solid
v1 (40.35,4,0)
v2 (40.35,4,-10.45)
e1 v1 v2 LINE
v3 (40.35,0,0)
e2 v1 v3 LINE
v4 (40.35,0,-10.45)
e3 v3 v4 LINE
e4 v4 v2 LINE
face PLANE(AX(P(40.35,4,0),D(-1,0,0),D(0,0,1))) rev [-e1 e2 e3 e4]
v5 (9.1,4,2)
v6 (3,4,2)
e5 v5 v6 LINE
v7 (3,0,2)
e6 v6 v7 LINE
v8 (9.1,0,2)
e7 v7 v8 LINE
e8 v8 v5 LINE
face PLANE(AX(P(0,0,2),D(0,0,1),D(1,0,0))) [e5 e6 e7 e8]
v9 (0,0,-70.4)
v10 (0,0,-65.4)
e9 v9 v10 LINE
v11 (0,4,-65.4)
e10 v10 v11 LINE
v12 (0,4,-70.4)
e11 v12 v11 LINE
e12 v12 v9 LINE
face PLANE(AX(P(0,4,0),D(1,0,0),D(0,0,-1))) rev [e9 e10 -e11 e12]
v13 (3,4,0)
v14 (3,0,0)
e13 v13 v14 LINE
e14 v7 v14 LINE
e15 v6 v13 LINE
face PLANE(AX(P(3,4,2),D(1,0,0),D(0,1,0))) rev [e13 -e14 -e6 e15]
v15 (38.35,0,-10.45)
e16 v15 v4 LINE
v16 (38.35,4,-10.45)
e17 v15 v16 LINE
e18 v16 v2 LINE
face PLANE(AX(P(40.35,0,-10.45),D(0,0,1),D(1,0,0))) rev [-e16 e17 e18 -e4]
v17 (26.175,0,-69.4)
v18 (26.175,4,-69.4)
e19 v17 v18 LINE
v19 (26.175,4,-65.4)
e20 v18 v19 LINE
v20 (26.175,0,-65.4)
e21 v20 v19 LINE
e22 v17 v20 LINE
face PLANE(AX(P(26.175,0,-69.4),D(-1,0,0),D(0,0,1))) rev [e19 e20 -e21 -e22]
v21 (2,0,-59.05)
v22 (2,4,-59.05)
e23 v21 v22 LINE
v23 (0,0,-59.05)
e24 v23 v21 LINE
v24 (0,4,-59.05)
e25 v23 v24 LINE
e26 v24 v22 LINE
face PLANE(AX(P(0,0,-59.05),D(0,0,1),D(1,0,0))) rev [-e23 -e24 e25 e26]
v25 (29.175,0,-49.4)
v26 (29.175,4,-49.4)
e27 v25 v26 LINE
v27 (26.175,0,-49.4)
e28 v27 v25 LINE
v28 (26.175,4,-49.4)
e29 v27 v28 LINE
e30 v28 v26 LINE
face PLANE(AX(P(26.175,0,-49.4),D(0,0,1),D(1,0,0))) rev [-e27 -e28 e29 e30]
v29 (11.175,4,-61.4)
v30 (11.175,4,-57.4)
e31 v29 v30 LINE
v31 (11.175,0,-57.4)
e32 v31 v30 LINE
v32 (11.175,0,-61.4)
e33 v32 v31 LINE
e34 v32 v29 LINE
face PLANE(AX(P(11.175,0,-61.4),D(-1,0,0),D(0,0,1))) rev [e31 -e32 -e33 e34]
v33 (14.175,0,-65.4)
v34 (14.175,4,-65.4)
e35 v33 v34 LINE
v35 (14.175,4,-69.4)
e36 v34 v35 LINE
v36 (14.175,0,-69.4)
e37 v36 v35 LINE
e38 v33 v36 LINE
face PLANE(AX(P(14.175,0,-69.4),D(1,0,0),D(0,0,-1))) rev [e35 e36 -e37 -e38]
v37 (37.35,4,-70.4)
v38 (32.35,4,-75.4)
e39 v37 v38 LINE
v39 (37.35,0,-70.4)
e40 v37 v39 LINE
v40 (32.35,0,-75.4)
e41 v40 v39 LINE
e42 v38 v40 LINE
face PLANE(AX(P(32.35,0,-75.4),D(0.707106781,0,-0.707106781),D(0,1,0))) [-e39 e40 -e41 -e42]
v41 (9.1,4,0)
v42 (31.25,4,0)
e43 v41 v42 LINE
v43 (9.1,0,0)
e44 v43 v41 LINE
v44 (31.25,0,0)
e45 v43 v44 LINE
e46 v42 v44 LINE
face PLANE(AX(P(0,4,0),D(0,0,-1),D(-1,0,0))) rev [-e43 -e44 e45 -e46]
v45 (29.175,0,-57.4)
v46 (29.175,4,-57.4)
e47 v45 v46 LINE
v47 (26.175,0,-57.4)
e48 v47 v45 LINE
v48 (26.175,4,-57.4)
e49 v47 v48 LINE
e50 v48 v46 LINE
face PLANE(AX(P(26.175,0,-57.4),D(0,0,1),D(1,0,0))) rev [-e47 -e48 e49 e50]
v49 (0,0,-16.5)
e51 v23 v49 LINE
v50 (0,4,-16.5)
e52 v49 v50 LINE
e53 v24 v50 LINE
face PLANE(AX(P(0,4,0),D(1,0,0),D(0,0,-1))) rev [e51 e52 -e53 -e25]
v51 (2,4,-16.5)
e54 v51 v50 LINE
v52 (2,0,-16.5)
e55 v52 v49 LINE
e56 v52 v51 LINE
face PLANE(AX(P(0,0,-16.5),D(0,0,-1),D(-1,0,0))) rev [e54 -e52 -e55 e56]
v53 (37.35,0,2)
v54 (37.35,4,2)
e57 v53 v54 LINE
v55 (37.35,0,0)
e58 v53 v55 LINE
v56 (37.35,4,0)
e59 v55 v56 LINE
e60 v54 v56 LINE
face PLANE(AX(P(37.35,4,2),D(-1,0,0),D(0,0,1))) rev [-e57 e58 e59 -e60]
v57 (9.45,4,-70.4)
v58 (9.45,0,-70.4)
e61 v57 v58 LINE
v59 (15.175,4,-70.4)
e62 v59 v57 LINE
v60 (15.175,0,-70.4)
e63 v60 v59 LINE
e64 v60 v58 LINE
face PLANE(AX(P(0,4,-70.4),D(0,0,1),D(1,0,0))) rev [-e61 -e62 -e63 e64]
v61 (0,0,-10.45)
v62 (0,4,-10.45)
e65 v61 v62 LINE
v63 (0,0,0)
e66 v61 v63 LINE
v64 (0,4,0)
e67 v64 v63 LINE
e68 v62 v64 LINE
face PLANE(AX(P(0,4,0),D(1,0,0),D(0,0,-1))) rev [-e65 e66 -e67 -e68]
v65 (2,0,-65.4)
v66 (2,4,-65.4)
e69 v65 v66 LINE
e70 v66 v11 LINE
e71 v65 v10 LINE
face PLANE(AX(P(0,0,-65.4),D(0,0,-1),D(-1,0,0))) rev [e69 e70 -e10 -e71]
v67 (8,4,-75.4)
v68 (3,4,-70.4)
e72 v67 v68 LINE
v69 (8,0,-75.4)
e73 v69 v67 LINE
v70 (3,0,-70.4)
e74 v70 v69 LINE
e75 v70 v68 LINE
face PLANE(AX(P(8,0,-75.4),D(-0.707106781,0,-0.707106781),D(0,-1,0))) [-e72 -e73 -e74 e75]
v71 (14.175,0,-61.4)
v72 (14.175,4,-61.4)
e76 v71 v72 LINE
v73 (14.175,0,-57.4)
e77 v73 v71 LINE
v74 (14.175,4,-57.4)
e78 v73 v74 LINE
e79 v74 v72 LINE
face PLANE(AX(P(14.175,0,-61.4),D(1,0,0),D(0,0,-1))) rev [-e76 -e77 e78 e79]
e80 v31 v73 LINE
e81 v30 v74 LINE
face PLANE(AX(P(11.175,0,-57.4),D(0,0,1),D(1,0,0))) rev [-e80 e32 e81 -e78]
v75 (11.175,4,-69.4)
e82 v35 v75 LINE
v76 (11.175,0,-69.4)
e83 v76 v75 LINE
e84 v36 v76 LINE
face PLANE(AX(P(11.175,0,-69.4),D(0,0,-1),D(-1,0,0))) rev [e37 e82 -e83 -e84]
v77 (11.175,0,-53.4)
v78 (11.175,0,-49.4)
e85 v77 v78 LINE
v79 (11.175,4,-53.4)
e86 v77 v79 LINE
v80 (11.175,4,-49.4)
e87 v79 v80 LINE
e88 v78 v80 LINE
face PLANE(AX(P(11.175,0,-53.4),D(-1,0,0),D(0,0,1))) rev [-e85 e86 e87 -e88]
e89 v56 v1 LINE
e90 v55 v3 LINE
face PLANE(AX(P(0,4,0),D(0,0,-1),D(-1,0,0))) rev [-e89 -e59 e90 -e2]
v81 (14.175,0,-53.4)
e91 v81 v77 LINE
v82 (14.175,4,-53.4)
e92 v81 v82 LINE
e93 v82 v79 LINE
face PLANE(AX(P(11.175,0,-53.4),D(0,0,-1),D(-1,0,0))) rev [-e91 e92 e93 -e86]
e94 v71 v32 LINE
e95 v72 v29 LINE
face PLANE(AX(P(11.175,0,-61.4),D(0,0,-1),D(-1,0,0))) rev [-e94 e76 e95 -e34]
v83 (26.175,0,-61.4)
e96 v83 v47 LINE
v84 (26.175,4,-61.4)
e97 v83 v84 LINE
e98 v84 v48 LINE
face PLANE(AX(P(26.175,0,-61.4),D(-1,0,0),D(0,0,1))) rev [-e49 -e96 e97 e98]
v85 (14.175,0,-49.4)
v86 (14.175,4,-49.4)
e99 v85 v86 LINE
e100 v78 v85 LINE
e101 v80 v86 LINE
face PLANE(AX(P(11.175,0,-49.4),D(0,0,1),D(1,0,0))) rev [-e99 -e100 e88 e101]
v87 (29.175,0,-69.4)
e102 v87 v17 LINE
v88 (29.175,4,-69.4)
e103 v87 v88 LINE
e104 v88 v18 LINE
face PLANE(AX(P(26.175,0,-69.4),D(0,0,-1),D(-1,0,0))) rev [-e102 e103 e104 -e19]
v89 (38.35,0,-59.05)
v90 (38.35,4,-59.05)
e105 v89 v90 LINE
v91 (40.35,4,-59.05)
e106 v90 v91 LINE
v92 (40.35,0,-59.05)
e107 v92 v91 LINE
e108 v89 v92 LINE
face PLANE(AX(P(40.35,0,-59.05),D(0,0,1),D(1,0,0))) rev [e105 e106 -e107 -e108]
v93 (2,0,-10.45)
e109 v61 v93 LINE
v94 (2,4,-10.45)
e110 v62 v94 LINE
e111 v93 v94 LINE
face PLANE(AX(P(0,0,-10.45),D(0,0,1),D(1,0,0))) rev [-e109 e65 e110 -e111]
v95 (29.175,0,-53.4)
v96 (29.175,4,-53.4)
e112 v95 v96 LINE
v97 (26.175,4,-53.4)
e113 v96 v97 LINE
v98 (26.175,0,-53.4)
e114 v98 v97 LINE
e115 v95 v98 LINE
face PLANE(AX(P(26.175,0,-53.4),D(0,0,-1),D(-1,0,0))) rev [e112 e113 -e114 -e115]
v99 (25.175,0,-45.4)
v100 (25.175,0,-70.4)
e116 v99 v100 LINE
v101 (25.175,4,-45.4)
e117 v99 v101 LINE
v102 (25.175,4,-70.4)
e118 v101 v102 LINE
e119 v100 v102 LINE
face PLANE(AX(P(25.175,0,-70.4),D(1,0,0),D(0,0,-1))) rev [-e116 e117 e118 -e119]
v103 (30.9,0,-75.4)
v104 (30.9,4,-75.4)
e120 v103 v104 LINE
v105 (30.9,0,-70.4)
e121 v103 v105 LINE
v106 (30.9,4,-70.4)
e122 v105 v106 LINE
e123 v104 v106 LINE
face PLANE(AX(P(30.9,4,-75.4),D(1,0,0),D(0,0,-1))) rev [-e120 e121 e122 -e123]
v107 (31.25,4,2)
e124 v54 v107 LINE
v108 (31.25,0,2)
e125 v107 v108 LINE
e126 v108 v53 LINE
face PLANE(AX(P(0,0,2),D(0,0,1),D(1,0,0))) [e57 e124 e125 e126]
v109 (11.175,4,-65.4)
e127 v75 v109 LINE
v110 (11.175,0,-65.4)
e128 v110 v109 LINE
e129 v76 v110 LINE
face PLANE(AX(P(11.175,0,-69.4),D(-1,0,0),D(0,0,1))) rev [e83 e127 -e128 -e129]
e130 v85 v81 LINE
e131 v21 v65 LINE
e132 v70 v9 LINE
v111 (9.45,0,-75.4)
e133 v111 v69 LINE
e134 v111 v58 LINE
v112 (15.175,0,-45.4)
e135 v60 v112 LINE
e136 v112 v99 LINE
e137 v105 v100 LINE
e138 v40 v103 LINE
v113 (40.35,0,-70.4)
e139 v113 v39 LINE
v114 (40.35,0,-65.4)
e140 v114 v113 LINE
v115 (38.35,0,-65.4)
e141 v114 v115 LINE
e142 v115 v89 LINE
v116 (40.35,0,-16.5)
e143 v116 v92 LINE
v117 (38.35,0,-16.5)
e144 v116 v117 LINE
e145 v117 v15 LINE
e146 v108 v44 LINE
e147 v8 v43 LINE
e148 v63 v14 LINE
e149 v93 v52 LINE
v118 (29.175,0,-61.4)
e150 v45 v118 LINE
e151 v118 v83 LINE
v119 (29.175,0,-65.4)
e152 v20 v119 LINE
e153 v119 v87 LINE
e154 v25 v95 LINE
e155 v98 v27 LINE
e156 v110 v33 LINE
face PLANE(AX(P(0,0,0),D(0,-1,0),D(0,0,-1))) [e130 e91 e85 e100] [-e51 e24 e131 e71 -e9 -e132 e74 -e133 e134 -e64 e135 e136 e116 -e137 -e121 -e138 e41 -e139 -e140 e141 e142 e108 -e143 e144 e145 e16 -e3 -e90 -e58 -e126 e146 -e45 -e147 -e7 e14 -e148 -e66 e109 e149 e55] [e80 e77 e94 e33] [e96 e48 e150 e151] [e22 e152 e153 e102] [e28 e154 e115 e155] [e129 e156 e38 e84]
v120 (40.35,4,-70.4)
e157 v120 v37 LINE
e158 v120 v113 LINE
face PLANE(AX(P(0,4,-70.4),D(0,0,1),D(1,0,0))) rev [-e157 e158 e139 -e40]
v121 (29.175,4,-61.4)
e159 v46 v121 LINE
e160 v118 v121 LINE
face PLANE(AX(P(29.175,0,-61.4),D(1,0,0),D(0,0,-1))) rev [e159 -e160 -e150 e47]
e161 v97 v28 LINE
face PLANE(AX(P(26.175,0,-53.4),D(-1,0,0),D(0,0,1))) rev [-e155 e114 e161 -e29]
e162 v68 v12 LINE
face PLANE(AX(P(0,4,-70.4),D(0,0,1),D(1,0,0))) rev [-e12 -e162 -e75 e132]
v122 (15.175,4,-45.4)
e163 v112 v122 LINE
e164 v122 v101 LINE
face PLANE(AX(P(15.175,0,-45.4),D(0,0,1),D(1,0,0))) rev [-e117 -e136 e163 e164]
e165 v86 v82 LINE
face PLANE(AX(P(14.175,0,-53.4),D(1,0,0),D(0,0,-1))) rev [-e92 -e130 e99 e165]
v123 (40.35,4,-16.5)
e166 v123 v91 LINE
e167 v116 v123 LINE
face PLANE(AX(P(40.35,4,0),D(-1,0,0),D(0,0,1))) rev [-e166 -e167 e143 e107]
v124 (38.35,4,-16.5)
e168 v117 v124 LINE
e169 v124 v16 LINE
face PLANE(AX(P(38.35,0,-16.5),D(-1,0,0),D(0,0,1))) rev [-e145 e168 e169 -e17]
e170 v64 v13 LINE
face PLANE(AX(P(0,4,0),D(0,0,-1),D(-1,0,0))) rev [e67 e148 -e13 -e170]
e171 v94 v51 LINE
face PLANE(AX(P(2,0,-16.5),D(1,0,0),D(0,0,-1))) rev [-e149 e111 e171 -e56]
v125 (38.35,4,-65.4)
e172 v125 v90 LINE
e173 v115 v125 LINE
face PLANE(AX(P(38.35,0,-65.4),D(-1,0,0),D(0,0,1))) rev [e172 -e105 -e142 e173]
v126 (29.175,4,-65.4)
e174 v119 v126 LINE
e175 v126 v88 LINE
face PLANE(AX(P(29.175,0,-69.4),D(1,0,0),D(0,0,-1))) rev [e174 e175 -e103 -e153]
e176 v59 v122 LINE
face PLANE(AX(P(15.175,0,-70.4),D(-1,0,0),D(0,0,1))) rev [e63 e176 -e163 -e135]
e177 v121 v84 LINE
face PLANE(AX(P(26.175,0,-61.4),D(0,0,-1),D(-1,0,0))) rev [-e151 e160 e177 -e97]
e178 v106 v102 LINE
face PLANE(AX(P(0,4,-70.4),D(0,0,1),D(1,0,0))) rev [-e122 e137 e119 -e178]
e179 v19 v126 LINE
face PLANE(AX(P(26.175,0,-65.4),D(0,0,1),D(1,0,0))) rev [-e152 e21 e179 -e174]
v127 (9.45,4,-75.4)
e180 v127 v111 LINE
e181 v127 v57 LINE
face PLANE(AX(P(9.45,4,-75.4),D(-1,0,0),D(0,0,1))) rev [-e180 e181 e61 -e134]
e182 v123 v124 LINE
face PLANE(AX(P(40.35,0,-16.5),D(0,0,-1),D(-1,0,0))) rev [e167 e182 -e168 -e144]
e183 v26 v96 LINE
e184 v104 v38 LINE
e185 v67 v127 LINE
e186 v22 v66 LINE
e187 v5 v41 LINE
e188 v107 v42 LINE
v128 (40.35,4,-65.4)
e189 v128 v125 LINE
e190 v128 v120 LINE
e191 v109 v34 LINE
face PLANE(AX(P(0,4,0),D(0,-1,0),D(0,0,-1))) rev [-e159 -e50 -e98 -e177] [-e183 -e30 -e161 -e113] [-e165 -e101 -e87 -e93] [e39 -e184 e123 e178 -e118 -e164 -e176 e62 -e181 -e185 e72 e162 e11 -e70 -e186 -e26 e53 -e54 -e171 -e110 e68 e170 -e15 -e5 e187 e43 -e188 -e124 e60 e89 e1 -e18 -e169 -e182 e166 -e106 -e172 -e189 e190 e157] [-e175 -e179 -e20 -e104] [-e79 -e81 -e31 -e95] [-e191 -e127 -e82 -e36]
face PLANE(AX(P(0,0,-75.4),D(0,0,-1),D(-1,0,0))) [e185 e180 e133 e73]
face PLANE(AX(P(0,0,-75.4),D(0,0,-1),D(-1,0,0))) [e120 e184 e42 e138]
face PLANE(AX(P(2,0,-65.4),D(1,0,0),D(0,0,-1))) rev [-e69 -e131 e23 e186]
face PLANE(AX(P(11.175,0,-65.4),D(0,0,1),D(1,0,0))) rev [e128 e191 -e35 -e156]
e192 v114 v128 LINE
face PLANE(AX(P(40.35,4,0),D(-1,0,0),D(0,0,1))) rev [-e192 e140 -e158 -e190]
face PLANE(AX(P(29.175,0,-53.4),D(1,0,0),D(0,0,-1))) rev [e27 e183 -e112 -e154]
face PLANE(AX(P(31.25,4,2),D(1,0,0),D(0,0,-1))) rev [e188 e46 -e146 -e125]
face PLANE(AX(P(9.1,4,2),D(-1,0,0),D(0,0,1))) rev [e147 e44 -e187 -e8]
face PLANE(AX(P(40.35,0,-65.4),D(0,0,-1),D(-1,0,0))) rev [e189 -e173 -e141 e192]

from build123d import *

# Parameters (mm, degrees)
SKETCH_1_W          = 40.35
SKETCH_1_H          = 70.4
EXTRUDE_1_DEPTH     = 4
SKETCH_2_W          = 2
SKETCH_2_H          = 6.05
SKETCH_2_H_2        = 6.35
SKETCH_2_W_2        = 10
SKETCH_2_H_3        = 25
CUT_EXTRUDE_3_DEPTH = 82.242122695
SKETCH_4_W          = 3
SKETCH_4_H          = 4
CUT_EXTRUDE_4_DEPTH = 82.242122695
SKETCH_5_W          = 6.45
SKETCH_5_H          = 4
EXTRUDE_2_DEPTH     = 5
CHAMFER_1_SIZE      = 5
SKETCH_6_W          = 6.1
SKETCH_6_H          = 4
EXTRUDE_3_DEPTH     = 2


with BuildPart() as part:
    # ｽｹｯﾁ1 → ﾎﾞｽ - 押し出し1 (new body)
    with BuildSketch(Plane(origin=(0, 0, 0), x_dir=(1, 0, 0), z_dir=(0, 1, 0))):
        with Locations((20.175, 35.2)):
            Rectangle(SKETCH_1_W, SKETCH_1_H)
    extrude(amount=EXTRUDE_1_DEPTH)

    # ｽｹｯﾁ2 → ｶｯﾄ - 押し出し3 (cut, through all)
    with BuildSketch(Plane(origin=(0, 4, 0), x_dir=(1, 0, 0), z_dir=(0, 1, 0))):
        with Locations((1, 13.475)):
            Rectangle(SKETCH_2_W, SKETCH_2_H)
        with Locations((39.35, 13.475)):
            Rectangle(SKETCH_2_W, SKETCH_2_H)
        with Locations((1, 62.225)):
            Rectangle(SKETCH_2_W, SKETCH_2_H_2)
        with Locations((39.35, 62.225)):
            Rectangle(SKETCH_2_W, SKETCH_2_H_2)
        with Locations((20.175, 57.9)):
            Rectangle(SKETCH_2_W_2, SKETCH_2_H_3)
    extrude(amount=-CUT_EXTRUDE_3_DEPTH, mode=Mode.SUBTRACT)

    # ｽｹｯﾁ4 → ｶｯﾄ - 押し出し4 (cut, through all)
    with BuildSketch(Plane(origin=(0, 4, 0), x_dir=(1, 0, 0), z_dir=(0, 1, 0))):
        with Locations((12.675, 67.4)):
            Rectangle(SKETCH_4_W, SKETCH_4_H)
        with Locations((12.675, 59.4)):
            Rectangle(SKETCH_4_W, SKETCH_4_H)
        with Locations((12.675, 51.4)):
            Rectangle(SKETCH_4_W, SKETCH_4_H)
        with Locations((27.675, 67.4)):
            Rectangle(SKETCH_4_W, SKETCH_4_H)
        with Locations((27.675, 59.4)):
            Rectangle(SKETCH_4_W, SKETCH_4_H)
        with Locations((27.675, 51.4)):
            Rectangle(SKETCH_4_W, SKETCH_4_H)
    extrude(amount=-CUT_EXTRUDE_4_DEPTH, mode=Mode.SUBTRACT)

    # ｽｹｯﾁ5 → ﾎﾞｽ - 押し出し2 (add)
    with BuildSketch(Plane(origin=(0, 0, -70.4), x_dir=(-1, 0, 0), z_dir=(0, 0, -1))):
        with Locations((-34.125, 2)):
            Rectangle(SKETCH_5_W, SKETCH_5_H)
        with Locations((-6.225, 2)):
            Rectangle(SKETCH_5_W, SKETCH_5_H)
    extrude(amount=EXTRUDE_2_DEPTH)

    # 面取り1
    chamfer_1_edges = [part.edges().sort_by_distance(p)[0] for p in [
        (3, 2, -75.4),
        (37.35, 2, -75.4),
    ]]
    chamfer(chamfer_1_edges, length=CHAMFER_1_SIZE - 0.0001)  # a hair under: the kernel refuses the full size

    # ｽｹｯﾁ6 → ﾎﾞｽ - 押し出し3 (add)
    with BuildSketch(Plane.XY):
        with Locations((6.05, 2)):
            Rectangle(SKETCH_6_W, SKETCH_6_H)
        with Locations((34.3, 2)):
            Rectangle(SKETCH_6_W, SKETCH_6_H)
    extrude(amount=EXTRUDE_3_DEPTH)


solid = part.part
